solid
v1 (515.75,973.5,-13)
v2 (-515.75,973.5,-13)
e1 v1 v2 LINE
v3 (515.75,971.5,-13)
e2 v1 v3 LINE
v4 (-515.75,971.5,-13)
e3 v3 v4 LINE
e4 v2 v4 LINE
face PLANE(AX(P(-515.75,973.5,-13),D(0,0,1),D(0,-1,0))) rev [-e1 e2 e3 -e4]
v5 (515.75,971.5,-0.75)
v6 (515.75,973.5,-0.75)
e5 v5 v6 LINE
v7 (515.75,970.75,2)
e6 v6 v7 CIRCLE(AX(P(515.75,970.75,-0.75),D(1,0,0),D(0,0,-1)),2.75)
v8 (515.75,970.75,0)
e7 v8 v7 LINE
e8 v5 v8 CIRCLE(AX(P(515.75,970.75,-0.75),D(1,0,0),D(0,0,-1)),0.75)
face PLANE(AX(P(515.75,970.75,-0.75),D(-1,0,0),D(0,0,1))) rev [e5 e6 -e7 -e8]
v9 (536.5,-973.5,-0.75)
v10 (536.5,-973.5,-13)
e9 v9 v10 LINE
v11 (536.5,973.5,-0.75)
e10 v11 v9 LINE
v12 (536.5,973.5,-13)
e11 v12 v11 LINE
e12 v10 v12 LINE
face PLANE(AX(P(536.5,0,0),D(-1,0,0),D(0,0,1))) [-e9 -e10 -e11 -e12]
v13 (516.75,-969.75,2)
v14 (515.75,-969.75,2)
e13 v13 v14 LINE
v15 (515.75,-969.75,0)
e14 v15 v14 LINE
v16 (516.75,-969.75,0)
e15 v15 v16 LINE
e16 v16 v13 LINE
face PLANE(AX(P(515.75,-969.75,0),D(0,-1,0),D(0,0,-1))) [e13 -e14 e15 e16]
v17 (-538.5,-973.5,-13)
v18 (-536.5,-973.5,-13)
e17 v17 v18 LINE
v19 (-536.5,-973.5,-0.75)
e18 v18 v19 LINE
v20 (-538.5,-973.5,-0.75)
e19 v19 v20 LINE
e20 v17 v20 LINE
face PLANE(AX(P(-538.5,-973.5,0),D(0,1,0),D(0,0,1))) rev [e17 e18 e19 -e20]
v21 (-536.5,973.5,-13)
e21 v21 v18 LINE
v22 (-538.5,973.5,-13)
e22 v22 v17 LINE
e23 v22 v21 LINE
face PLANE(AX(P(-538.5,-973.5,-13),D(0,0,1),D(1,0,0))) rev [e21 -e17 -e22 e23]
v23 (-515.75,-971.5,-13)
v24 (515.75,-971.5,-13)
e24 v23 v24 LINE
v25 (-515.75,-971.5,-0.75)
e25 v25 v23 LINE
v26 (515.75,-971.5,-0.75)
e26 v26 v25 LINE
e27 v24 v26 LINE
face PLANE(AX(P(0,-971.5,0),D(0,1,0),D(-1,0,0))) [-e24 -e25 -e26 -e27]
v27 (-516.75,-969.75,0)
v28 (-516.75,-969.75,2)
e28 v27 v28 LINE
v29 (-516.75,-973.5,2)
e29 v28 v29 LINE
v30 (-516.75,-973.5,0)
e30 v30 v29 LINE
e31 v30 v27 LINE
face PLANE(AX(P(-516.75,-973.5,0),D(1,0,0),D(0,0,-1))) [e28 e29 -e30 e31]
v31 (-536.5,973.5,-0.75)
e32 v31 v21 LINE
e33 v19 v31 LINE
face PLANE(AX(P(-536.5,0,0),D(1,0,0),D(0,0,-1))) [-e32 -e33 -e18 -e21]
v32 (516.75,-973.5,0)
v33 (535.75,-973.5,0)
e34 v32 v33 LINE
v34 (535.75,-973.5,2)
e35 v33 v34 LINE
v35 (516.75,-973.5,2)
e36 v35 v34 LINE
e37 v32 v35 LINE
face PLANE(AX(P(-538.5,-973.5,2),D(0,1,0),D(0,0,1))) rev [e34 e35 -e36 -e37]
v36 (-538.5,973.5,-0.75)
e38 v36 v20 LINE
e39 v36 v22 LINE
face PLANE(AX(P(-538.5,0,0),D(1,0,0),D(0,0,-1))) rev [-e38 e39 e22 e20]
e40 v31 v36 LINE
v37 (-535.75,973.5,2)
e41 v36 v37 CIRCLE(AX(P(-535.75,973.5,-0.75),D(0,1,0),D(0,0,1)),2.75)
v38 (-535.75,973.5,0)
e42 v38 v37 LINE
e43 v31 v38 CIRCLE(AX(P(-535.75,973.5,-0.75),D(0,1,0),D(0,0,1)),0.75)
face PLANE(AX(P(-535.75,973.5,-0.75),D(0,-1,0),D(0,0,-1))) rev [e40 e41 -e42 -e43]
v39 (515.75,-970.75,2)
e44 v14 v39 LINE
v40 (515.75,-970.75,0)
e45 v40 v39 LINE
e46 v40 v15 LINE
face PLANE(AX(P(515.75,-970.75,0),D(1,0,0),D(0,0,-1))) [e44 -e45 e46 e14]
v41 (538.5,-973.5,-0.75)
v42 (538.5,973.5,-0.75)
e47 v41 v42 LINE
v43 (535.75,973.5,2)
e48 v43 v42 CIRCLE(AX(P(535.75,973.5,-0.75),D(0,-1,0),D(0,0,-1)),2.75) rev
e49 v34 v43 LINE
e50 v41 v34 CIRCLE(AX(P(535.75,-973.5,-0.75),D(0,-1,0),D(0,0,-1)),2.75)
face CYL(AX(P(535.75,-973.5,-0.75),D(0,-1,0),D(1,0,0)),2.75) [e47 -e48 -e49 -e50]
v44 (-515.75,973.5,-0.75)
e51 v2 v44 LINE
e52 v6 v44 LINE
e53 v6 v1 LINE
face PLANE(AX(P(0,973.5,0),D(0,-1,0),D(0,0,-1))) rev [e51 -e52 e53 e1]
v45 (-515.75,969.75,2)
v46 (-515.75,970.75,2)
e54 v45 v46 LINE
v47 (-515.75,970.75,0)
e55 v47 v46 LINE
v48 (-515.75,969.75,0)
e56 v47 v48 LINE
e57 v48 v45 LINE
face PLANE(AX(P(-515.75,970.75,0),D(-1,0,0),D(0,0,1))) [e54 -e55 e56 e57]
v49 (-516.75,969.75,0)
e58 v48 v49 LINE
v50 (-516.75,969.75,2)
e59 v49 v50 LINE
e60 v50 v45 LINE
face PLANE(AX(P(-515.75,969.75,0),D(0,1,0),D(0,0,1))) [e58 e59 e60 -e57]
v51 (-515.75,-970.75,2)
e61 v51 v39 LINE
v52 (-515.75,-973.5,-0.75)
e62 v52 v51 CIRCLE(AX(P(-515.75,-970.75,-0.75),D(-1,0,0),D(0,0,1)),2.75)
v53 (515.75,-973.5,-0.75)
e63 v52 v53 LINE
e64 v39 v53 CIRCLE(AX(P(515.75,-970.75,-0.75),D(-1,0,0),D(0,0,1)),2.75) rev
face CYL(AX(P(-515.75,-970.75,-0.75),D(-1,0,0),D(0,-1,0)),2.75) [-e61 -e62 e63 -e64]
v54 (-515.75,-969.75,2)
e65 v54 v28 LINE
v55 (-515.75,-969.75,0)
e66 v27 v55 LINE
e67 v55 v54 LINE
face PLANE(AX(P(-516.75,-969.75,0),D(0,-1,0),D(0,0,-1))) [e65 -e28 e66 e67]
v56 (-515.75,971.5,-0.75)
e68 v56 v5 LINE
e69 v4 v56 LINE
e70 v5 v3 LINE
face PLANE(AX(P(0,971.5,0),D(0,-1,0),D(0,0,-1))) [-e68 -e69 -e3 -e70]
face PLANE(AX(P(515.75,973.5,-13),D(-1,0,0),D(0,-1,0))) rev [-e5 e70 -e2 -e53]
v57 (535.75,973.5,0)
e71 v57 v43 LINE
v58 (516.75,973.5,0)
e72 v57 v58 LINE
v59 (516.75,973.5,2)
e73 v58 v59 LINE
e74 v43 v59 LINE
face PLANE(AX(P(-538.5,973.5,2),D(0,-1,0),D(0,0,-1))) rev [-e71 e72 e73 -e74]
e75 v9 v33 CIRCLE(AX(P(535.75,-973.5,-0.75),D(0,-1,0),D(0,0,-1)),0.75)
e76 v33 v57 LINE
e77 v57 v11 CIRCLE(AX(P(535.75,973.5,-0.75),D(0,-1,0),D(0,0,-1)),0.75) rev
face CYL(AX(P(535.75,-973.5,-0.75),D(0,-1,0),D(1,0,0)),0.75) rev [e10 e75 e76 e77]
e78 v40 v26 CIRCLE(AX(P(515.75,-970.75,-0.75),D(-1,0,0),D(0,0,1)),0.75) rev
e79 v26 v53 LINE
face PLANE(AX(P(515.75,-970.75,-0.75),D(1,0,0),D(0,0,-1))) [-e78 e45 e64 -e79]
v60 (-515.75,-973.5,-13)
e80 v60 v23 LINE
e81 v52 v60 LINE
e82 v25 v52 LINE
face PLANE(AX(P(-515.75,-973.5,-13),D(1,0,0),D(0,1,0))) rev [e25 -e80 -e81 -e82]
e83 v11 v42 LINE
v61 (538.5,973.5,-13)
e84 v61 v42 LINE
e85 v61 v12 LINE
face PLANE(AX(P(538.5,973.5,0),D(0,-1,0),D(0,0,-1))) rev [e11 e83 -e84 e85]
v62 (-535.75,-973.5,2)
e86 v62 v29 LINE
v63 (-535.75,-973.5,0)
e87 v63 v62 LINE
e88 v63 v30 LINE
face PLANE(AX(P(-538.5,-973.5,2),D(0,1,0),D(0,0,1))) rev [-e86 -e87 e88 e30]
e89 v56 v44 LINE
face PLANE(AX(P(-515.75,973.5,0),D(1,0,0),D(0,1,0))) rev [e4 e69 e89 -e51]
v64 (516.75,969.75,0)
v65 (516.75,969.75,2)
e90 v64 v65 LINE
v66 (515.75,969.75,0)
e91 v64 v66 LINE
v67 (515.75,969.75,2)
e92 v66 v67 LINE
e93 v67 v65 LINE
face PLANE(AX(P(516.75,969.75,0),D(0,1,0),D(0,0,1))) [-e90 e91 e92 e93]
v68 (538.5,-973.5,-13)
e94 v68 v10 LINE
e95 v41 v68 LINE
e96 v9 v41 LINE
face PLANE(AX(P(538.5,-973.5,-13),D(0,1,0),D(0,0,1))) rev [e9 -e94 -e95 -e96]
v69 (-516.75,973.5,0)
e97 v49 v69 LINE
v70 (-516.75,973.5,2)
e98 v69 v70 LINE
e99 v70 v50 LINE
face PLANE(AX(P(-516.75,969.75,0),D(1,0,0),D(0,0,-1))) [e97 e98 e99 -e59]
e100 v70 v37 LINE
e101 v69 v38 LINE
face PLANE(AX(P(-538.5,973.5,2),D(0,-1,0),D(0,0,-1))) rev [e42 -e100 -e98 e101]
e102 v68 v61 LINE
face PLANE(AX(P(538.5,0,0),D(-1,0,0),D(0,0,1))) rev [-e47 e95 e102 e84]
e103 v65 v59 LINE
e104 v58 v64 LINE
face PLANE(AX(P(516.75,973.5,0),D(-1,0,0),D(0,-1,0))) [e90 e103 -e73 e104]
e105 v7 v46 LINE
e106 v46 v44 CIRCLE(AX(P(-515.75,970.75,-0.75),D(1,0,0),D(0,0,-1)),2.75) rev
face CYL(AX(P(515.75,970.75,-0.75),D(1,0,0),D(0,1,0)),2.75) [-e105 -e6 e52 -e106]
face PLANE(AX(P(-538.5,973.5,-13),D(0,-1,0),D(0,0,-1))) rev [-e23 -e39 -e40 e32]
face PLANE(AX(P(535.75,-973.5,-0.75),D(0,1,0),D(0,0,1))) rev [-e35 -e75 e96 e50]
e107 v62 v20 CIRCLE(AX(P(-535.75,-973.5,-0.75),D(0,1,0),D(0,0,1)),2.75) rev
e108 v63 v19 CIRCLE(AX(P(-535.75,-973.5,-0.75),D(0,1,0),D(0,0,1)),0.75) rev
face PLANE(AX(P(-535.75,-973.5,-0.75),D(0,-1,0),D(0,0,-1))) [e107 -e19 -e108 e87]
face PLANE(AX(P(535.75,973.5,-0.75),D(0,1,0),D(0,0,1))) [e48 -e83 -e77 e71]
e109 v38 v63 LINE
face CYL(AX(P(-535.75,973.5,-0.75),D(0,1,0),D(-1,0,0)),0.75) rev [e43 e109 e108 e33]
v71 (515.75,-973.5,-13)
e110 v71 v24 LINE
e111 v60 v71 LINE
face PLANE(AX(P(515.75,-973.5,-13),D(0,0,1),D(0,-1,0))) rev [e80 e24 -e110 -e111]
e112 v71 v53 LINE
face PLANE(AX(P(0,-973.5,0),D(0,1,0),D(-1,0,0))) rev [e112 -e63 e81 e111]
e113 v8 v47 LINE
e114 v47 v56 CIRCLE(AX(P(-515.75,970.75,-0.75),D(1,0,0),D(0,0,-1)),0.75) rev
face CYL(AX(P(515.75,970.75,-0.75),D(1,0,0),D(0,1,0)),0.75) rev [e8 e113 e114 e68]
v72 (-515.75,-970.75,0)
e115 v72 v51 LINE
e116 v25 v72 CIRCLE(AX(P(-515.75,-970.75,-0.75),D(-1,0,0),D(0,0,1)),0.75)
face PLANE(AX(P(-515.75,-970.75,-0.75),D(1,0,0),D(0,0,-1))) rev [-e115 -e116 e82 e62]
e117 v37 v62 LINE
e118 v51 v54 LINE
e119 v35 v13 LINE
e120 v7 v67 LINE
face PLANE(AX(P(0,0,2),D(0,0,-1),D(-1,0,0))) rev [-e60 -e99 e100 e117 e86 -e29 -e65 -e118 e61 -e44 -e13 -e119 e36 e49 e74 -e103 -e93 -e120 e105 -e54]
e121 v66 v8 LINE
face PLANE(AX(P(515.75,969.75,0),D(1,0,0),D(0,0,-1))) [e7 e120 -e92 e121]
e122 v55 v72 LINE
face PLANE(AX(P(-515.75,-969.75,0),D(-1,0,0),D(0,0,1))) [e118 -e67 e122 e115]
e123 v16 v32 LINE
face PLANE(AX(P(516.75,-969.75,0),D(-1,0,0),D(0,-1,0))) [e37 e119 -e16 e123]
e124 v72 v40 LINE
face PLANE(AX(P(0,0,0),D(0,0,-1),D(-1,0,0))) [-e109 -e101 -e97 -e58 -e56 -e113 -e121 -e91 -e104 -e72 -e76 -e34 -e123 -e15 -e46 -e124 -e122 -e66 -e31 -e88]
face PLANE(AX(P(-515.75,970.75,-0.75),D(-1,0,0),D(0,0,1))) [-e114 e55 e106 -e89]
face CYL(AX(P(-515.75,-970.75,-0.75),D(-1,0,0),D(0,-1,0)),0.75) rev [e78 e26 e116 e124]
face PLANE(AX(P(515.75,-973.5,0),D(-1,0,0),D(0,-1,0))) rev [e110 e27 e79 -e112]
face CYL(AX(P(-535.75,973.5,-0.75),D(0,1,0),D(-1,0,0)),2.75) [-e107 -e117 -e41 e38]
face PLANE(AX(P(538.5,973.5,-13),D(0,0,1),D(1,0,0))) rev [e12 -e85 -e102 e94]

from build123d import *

# Parameters (mm, degrees)
SKETCH_1_W                          = 1077
SKETCH_1_H                          = 1947
SM_BASE_FLANGE_1_DEPTH              = 2
SM_EDGE_FLANGE_1_STRIP_W            = 9.5
SM_EDGE_FLANGE_1_STRIP_H            = 2
SM_EDGE_FLANGE_1_STRIP_CUT_DEPTH    = 1947
SM_EDGE_FLANGE_1_STRIP_2_W          = 9.5
SM_EDGE_FLANGE_1_STRIP_2_H          = 2
SM_EDGE_FLANGE_1_STRIP_CUT_2_DEPTH  = 1947
SM_EDGE_FLANGE_1_DEPTH              = 1947
SM_EDGE_FLANGE_1_BEND_DEPTH         = 1947
SM_EDGE_FLANGE_2_STRIP_W            = 9.5
SM_EDGE_FLANGE_2_STRIP_H            = 2
SM_EDGE_FLANGE_2_STRIP_CUT_DEPTH    = 1031.5
SM_EDGE_FLANGE_2_RELIEF_W           = 10.5
SM_EDGE_FLANGE_2_RELIEF_H           = 1
SM_EDGE_FLANGE_2_RELIEF_CUT_DEPTH   = 2
SM_EDGE_FLANGE_2_STRIP_2_W          = 9.5
SM_EDGE_FLANGE_2_STRIP_2_H          = 2
SM_EDGE_FLANGE_2_STRIP_CUT_2_DEPTH  = 1031.5
SM_EDGE_FLANGE_2_RELIEF_2_W         = 10.5
SM_EDGE_FLANGE_2_RELIEF_2_H         = 1
SM_EDGE_FLANGE_2_RELIEF_CUT_2_DEPTH = 2
SM_EDGE_FLANGE_2_DEPTH              = 1031.5
SM_EDGE_FLANGE_2_BEND_DEPTH         = 1031.5


# Sheet-metal steps are written as plain solids
with BuildPart() as part:
    # Sketch 1 → Базовая кромка1 (new body)
    with BuildSketch(Plane.XY):
        Rectangle(SKETCH_1_W, SKETCH_1_H)
    extrude(amount=SM_BASE_FLANGE_1_DEPTH)

    # Ребро-кромка1 strip (across the edge) → Ребро-кромка1 strip cut (cut)
    with BuildSketch(Plane(origin=(-538.5, -973.5, 0), x_dir=(1, 0, 0), z_dir=(0, 1, 0))):
        with Locations((-2, -1)):
            Rectangle(SM_EDGE_FLANGE_1_STRIP_W, SM_EDGE_FLANGE_1_STRIP_H)
    extrude(amount=SM_EDGE_FLANGE_1_STRIP_CUT_DEPTH, mode=Mode.SUBTRACT)

    # Ребро-кромка1 strip 2 (across the edge) → Ребро-кромка1 strip cut 2 (cut)
    with BuildSketch(Plane(origin=(538.5, 973.5, 0), x_dir=(-1, 0, 0), z_dir=(0, -1, 0))):
        with Locations((-2, -1)):
            Rectangle(SM_EDGE_FLANGE_1_STRIP_2_W, SM_EDGE_FLANGE_1_STRIP_2_H)
    extrude(amount=SM_EDGE_FLANGE_1_STRIP_CUT_2_DEPTH, mode=Mode.SUBTRACT)

    # Ребро-кромка1 section (across the edge) → Ребро-кромка1 (add)
    with BuildSketch(Plane(origin=(-538.5, -973.5, 0), x_dir=(1, 0, 0), z_dir=(0, 1, 0))):
        with BuildLine():
            Line((0, 0.75), (0, 13))
            Line((0, 13), (2, 13))
            Line((2, 13), (2, 0.75))
            ThreePointArc((2, 0.75), (2.219669914, 0.219669914), (2.75, 0))
            Line((2.75, 0), (2.75, -2))
            ThreePointArc((2.75, -2), (0.805456352, -1.194543648), (0, 0.75))
        make_face()
    extrude(amount=SM_EDGE_FLANGE_1_DEPTH)

    # Ребро-кромка1 section 2 (across the edge) → Ребро-кромка1 bend (add)
    with BuildSketch(Plane(origin=(538.5, 973.5, 0), x_dir=(-1, 0, 0), z_dir=(0, -1, 0))):
        with BuildLine():
            Line((0, 0.75), (0, 13))
            Line((0, 13), (2, 13))
            Line((2, 13), (2, 0.75))
            ThreePointArc((2, 0.75), (2.219669914, 0.219669914), (2.75, 0))
            Line((2.75, 0), (2.75, -2))
            ThreePointArc((2.75, -2), (0.805456352, -1.194543648), (0, 0.75))
        make_face()
    extrude(amount=SM_EDGE_FLANGE_1_BEND_DEPTH)

    # Ребро-кромка2 strip (across the edge) → Ребро-кромка2 strip cut (cut)
    with BuildSketch(Plane(origin=(-515.75, 973.5, 0), x_dir=(0, -1, 0), z_dir=(1, 0, 0))):
        with Locations((-2, -1)):
            Rectangle(SM_EDGE_FLANGE_2_STRIP_W, SM_EDGE_FLANGE_2_STRIP_H)
    extrude(amount=SM_EDGE_FLANGE_2_STRIP_CUT_DEPTH, mode=Mode.SUBTRACT)

    # Ребро-кромка2 relief (on the sheet) → Ребро-кромка2 relief cut (cut)
    with BuildSketch(Plane(origin=(-515.75, 970.75, 0), x_dir=(0, -1, 0), z_dir=(0, 0, -1))):
        with Locations((-4.25, 0.5)):
            Rectangle(SM_EDGE_FLANGE_2_RELIEF_W, SM_EDGE_FLANGE_2_RELIEF_H)
        with Locations((-4.25, -1032)):
            Rectangle(SM_EDGE_FLANGE_2_RELIEF_W, SM_EDGE_FLANGE_2_RELIEF_H)
    extrude(amount=-SM_EDGE_FLANGE_2_RELIEF_CUT_DEPTH, mode=Mode.SUBTRACT)

    # Ребро-кромка2 strip 2 (across the edge) → Ребро-кромка2 strip cut 2 (cut)
    with BuildSketch(Plane(origin=(515.75, -973.5, 0), x_dir=(0, 1, 0), z_dir=(-1, 0, 0))):
        with Locations((-2, -1)):
            Rectangle(SM_EDGE_FLANGE_2_STRIP_2_W, SM_EDGE_FLANGE_2_STRIP_2_H)
    extrude(amount=SM_EDGE_FLANGE_2_STRIP_CUT_2_DEPTH, mode=Mode.SUBTRACT)

    # Ребро-кромка2 relief 2 (on the sheet) → Ребро-кромка2 relief cut 2 (cut)
    with BuildSketch(Plane(origin=(515.75, -970.75, 0), x_dir=(0, 1, 0), z_dir=(0, 0, -1))):
        with Locations((-4.25, 0.5)):
            Rectangle(SM_EDGE_FLANGE_2_RELIEF_2_W, SM_EDGE_FLANGE_2_RELIEF_2_H)
        with Locations((-4.25, -1032)):
            Rectangle(SM_EDGE_FLANGE_2_RELIEF_2_W, SM_EDGE_FLANGE_2_RELIEF_2_H)
    extrude(amount=-SM_EDGE_FLANGE_2_RELIEF_CUT_2_DEPTH, mode=Mode.SUBTRACT)

    # Ребро-кромка2 section (across the edge) → Ребро-кромка2 (add)
    with BuildSketch(Plane(origin=(-515.75, 973.5, 0), x_dir=(0, -1, 0), z_dir=(1, 0, 0))):
        with BuildLine():
            Line((0, 0.75), (0, 13))
            Line((0, 13), (2, 13))
            Line((2, 13), (2, 0.75))
            ThreePointArc((2, 0.75), (2.219669914, 0.219669914), (2.75, 0))
            Line((2.75, 0), (2.75, -2))
            ThreePointArc((2.75, -2), (0.805456352, -1.194543648), (0, 0.75))
        make_face()
    extrude(amount=SM_EDGE_FLANGE_2_DEPTH)

    # Ребро-кромка2 section 2 (across the edge) → Ребро-кромка2 bend (add)
    with BuildSketch(Plane(origin=(515.75, -973.5, 0), x_dir=(0, 1, 0), z_dir=(-1, 0, 0))):
        with BuildLine():
            Line((0, 0.75), (0, 13))
            Line((0, 13), (2, 13))
            Line((2, 13), (2, 0.75))
            ThreePointArc((2, 0.75), (2.219669914, 0.219669914), (2.75, 0))
            Line((2.75, 0), (2.75, -2))
            ThreePointArc((2.75, -2), (0.805456352, -1.194543648), (0, 0.75))
        make_face()
    extrude(amount=SM_EDGE_FLANGE_2_BEND_DEPTH)


solid = part.part
